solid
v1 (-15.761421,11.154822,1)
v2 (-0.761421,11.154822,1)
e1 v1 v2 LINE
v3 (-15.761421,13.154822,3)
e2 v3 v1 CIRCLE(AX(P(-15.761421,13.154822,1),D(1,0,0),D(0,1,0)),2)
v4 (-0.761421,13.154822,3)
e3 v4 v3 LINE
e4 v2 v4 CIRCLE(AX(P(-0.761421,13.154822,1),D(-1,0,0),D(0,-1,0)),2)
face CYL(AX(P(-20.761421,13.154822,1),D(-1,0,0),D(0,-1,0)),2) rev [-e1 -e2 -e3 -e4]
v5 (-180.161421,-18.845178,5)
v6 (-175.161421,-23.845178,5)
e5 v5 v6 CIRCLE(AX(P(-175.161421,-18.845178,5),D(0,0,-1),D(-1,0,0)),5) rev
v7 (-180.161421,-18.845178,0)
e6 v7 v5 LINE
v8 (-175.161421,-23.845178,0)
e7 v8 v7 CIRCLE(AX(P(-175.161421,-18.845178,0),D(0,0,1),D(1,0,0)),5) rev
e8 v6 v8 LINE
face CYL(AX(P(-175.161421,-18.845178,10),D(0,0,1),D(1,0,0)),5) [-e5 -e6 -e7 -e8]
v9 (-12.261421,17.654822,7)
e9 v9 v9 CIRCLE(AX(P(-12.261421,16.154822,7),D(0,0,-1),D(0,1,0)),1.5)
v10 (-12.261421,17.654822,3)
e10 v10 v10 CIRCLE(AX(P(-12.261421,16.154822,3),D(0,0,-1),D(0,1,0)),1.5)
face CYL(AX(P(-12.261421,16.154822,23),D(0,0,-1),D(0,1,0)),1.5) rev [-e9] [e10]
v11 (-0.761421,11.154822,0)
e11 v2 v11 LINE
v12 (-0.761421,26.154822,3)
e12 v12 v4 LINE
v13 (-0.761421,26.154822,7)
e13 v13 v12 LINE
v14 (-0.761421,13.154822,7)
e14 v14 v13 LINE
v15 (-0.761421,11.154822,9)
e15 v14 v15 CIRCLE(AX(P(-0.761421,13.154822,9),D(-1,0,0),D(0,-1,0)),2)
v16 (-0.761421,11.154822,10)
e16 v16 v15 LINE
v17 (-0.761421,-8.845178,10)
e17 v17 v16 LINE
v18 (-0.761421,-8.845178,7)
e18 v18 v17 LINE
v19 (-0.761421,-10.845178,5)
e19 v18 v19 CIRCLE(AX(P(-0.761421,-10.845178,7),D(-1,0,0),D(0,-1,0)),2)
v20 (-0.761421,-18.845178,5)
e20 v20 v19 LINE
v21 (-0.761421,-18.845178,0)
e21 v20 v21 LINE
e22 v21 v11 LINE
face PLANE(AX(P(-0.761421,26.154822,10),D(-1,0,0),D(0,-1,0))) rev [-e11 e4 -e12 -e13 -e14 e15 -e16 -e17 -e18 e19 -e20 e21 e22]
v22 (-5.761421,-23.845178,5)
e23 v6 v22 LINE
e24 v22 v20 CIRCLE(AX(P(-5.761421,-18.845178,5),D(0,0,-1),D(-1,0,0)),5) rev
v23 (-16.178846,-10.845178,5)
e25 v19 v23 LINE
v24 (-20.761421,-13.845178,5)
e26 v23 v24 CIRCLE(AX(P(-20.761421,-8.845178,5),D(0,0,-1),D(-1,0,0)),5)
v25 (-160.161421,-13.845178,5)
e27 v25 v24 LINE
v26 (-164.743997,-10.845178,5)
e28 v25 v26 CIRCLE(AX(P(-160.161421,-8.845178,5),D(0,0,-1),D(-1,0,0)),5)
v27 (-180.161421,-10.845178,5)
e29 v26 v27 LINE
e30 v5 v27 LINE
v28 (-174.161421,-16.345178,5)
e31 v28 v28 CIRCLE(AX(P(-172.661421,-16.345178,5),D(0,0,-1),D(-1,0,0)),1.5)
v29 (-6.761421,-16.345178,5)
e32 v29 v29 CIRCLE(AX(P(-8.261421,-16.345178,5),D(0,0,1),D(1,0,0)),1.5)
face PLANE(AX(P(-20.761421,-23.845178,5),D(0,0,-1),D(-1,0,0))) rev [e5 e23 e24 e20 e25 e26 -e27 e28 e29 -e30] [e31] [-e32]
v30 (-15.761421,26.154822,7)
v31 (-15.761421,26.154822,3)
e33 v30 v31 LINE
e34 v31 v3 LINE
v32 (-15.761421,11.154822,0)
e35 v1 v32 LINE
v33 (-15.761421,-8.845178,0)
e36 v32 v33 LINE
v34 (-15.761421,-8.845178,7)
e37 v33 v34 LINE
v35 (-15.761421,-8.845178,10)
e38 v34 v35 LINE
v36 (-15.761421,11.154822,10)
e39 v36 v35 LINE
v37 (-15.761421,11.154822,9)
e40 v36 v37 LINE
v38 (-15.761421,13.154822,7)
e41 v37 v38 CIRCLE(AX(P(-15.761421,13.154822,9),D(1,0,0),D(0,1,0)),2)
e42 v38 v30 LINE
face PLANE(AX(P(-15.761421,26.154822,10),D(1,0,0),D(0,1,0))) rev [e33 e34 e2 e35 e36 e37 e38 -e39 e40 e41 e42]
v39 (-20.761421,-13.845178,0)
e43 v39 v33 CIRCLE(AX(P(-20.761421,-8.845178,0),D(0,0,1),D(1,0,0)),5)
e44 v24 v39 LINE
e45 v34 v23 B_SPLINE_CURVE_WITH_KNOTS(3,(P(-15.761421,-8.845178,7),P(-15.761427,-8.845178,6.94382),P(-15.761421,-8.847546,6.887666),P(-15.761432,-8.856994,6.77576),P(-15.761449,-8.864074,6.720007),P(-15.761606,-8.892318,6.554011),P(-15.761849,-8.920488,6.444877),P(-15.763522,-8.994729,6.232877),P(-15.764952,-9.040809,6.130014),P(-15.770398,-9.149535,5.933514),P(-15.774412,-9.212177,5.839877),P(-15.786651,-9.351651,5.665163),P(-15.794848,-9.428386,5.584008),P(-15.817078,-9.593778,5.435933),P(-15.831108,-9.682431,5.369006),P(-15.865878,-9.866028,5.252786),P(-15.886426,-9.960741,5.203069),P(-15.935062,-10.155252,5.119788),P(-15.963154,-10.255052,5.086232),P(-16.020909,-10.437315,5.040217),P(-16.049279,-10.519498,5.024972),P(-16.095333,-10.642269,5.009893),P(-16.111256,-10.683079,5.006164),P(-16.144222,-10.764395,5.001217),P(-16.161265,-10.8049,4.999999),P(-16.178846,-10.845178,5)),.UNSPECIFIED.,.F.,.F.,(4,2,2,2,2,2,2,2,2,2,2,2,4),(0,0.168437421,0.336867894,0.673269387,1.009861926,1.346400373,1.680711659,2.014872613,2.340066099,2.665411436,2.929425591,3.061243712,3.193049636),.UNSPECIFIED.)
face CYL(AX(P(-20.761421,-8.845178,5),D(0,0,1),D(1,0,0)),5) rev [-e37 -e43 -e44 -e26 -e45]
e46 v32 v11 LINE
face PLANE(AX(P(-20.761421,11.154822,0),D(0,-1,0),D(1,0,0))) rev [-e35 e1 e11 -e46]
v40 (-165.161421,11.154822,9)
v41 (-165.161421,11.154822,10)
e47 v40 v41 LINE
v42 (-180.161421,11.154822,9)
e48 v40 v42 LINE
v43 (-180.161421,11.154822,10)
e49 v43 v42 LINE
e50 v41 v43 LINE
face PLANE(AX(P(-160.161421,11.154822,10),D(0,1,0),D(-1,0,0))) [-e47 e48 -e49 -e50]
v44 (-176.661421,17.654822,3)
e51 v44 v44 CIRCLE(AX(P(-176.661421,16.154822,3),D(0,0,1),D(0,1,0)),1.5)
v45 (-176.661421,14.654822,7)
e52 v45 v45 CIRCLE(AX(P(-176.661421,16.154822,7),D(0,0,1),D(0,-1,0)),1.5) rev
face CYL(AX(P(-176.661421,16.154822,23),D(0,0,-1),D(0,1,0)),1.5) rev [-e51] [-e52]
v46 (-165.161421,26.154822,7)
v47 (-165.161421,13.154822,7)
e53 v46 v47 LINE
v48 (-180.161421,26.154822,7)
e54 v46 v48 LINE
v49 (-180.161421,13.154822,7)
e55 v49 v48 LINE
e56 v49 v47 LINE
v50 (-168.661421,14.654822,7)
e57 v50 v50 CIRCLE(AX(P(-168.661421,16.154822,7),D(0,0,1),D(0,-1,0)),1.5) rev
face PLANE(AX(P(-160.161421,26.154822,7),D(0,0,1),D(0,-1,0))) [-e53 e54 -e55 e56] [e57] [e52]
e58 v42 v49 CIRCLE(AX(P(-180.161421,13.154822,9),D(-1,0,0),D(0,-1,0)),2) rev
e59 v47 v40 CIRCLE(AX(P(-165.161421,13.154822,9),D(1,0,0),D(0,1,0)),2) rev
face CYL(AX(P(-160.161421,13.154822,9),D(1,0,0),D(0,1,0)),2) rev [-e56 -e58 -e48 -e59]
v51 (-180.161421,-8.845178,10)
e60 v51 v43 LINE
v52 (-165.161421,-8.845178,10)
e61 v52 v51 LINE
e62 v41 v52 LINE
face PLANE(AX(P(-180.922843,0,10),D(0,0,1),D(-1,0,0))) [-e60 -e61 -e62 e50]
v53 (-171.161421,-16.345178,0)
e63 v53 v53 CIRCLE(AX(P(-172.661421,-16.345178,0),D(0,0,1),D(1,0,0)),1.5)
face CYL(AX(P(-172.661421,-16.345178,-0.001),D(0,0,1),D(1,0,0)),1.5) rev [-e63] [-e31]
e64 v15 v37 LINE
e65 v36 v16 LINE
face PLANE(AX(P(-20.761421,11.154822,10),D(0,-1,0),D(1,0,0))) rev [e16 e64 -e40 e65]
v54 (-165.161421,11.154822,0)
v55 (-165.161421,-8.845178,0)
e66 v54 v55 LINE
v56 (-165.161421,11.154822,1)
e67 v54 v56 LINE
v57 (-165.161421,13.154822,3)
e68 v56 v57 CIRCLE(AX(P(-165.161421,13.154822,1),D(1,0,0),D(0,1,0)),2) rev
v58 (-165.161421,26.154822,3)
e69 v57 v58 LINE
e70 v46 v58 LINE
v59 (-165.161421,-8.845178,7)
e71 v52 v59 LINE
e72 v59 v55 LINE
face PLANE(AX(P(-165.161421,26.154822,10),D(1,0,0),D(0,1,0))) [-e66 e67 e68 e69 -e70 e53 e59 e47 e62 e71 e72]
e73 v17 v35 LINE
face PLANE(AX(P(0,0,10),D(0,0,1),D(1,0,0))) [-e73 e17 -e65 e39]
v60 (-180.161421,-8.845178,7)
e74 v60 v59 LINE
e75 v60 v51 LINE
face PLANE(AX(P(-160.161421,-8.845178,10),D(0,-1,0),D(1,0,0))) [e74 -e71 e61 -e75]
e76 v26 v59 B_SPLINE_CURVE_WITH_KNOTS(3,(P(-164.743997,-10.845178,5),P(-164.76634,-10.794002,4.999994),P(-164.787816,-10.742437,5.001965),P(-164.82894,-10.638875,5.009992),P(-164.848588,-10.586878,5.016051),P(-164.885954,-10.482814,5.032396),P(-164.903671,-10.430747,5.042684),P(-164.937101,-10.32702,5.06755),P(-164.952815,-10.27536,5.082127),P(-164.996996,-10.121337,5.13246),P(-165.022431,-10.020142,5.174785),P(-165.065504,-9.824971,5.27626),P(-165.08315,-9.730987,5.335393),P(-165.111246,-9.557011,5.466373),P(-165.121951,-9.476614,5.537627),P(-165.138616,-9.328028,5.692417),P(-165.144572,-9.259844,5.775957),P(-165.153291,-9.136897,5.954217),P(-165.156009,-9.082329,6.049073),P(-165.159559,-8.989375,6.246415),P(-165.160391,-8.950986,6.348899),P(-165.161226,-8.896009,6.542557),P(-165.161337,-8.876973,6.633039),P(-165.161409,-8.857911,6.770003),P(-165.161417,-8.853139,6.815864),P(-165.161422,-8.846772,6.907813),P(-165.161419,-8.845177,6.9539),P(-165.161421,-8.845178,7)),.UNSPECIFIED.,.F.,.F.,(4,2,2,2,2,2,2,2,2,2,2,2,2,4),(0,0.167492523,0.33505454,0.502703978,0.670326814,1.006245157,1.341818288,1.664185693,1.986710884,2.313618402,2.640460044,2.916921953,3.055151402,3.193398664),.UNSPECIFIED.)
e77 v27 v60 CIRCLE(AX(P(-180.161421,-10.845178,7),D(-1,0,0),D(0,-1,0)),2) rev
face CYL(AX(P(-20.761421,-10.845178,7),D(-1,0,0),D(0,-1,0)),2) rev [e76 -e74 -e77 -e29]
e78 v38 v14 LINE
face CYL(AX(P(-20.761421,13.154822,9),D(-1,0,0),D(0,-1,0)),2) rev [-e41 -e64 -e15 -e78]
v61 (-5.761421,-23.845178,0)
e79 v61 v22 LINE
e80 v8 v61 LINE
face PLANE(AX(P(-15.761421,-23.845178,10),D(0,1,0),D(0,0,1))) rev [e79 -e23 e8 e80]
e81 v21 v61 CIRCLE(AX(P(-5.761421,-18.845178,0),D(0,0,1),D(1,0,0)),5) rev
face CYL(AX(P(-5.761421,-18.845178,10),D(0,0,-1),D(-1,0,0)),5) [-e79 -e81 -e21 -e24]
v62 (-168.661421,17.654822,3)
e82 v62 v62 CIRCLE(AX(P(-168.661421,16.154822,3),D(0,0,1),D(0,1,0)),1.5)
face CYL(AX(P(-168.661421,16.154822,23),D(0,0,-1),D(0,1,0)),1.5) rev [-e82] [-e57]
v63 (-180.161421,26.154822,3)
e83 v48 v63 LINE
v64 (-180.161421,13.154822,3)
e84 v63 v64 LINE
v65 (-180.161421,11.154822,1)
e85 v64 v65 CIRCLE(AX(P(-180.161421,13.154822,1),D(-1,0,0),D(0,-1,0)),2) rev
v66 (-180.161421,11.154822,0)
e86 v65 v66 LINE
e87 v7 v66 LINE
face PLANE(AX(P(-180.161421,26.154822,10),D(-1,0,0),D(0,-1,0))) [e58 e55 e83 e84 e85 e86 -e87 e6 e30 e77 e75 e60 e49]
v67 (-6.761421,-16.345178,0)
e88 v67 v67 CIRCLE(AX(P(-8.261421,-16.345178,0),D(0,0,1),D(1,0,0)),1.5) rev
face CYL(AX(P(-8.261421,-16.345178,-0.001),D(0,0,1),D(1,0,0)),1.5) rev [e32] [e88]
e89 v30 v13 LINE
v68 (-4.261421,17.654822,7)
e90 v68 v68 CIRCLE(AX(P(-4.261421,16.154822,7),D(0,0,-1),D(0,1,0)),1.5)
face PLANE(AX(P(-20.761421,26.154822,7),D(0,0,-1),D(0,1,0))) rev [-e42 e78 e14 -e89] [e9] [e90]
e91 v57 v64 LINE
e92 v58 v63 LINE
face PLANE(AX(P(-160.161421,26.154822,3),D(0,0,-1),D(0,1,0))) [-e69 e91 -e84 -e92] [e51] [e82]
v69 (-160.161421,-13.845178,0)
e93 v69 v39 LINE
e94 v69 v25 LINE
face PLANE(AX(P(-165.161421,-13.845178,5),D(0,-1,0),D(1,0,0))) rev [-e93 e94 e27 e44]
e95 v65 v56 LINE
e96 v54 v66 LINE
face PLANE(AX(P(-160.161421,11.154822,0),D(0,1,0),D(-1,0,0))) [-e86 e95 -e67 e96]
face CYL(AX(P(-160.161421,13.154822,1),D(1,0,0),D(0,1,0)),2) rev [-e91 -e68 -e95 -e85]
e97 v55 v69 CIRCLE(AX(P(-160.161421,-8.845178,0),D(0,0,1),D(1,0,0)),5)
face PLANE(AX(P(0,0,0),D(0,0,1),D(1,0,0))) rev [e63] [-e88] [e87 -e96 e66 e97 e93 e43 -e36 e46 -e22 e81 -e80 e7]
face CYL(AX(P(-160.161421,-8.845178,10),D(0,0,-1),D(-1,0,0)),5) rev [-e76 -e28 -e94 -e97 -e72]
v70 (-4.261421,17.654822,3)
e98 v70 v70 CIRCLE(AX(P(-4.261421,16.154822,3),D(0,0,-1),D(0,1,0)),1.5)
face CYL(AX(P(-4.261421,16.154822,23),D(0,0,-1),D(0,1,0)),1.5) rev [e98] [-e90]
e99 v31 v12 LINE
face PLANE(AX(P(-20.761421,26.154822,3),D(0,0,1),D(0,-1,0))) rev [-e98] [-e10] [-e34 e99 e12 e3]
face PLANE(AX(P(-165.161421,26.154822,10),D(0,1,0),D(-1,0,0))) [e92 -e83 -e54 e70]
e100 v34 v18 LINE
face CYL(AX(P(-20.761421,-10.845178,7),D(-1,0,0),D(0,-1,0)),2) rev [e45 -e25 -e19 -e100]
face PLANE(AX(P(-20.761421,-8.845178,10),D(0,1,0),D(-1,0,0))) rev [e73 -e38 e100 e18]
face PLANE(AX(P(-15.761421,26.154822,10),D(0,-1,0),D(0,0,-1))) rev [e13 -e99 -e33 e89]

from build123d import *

# Parameters (mm, degrees)
SKETCH1_W            = 15
SKETCH1_H            = 50
BOSS_EXTRUDE1_DEPTH  = 10
SKETCH2_W            = 3
SKETCH2_H            = 15
CUT_EXTRUDE1_DEPTH   = 20
SKETCH3_R            = 1.5
CUT_EXTRUDE2_DEPTH   = 20
SKETCH4_W            = 5
SKETCH4_H            = 15
CUT_EXTRUDE3_DEPTH   = 20
CUT_EXTRUDE4_REACH   = 32.943
SKETCH5_R            = 1.5
FILLET1_R            = 2
SKETCH6_W            = 5
SKETCH6_H            = 10
BOSS_EXTRUDE2_DEPTH  = 149.4
FILLET1_OF_MIRROR5_R = 2
FILLET2_R            = 5


with BuildPart() as part:
    # Sketch1 → Boss-Extrude1 (new body)
    with BuildSketch(Plane.XY):
        with Locations((-8.26142132, 1.154822335)):
            Rectangle(SKETCH1_W, SKETCH1_H)
    boss_extrude1 = extrude(amount=BOSS_EXTRUDE1_DEPTH)

    # Sketch2 → Cut-Extrude1 (cut)
    with BuildSketch(Plane(origin=(-0.76142132, 0, 0), x_dir=(0, 0, -1), z_dir=(1, 0, 0))):
        with Locations((-1.5, 18.654822335)):
            Rectangle(SKETCH2_W, SKETCH2_H)
        with Locations((-8.5, 18.654822335)):
            Rectangle(SKETCH2_W, SKETCH2_H)
    cut_extrude1 = extrude(amount=-CUT_EXTRUDE1_DEPTH, mode=Mode.SUBTRACT)

    # Sketch3 → Cut-Extrude2 (cut)
    with BuildSketch(Plane(origin=(0, 0, 3), x_dir=(-1, 0, 0), z_dir=(0, 0, -1))):
        with Locations(Location((4.26142132, 16.154822335, 0), (0, 0, 90))):
            Circle(SKETCH3_R)
        with Locations(Location((12.26142132, 16.154822335, 0), (0, 0, 90))):
            Circle(SKETCH3_R)
    cut_extrude2 = extrude(amount=-CUT_EXTRUDE2_DEPTH, mode=Mode.SUBTRACT)

    # Sketch4 → Cut-Extrude3 (cut)
    with BuildSketch(Plane(origin=(-0.76142132, 0, 0), x_dir=(0, 0, -1), z_dir=(1, 0, 0))):
        with Locations((-7.5, -16.345177665)):
            Rectangle(SKETCH4_W, SKETCH4_H)
    cut_extrude3 = extrude(amount=-CUT_EXTRUDE3_DEPTH, mode=Mode.SUBTRACT)

    # Sketch5 → Cut-Extrude4 (cut, up to next)
    with BuildSketch(Plane.XY.offset(5), mode=Mode.PRIVATE) as cut_extrude4_sk1:
        with Locations((-8.26142132, -16.345177665)):
            Circle(SKETCH5_R)
    cut_extrude4_tool1 = extrude(cut_extrude4_sk1.sketch, amount=-CUT_EXTRUDE4_REACH, mode=Mode.PRIVATE) & part.part
    cut_extrude4 = cut_extrude4_tool1.solids().sort_by_distance((-8.261421, -16.345178, 5))[0]
    add(cut_extrude4, mode=Mode.SUBTRACT)

    # Fillet1
    fillet1_edges = [part.edges().sort_by_distance(p)[0] for p in [
        (-8.26142132, 11.154822335, 3),
        (-8.26142132, 11.154822335, 7),
        (-8.26142132, -8.845177665, 5),
    ]]
    fillet(fillet1_edges, radius=FILLET1_R)

    # Sketch6 → Boss-Extrude2 (add)
    with BuildSketch(Plane.ZY.offset(15.76142132)):
        with Locations((2.5, -18.845177665)):
            Rectangle(SKETCH6_W, SKETCH6_H)
    extrude(amount=BOSS_EXTRUDE2_DEPTH)

    # Mirror5: Boss-Extrude1, Cut-Extrude1, Cut-Extrude2, Cut-Extrude3, Cut-Extrude4 across plane
    add(boss_extrude1.mirror(Plane.ZY.offset(90.46142132)))
    add(cut_extrude1.mirror(Plane.ZY.offset(90.46142132)), mode=Mode.SUBTRACT)
    add(cut_extrude2.mirror(Plane.ZY.offset(90.46142132)), mode=Mode.SUBTRACT)
    add(cut_extrude3.mirror(Plane.ZY.offset(90.46142132)), mode=Mode.SUBTRACT)
    add(cut_extrude4.mirror(Plane.ZY.offset(90.46142132)), mode=Mode.SUBTRACT)

    # Fillet1 of Mirror5
    fillet1_of_mirror5_edges = [part.edges().sort_by_distance(p)[0] for p in [
        (-172.66142132, 11.154822335, 3),
        (-172.66142132, 11.154822335, 7),
        (-172.66142132, -8.845177665, 5),
    ]]
    fillet(fillet1_of_mirror5_edges, radius=FILLET1_OF_MIRROR5_R)

    # Fillet2
    fillet2_edges = [part.edges().sort_by_distance(p)[0] for p in [
        (-180.16142132, -23.845177665, 2.5),
        (-0.76142132, -23.845177665, 2.5),
        (-165.16142132, -13.845177665, 2.5),
        (-15.76142132, -13.845177665, 2.5),
    ]]
    fillet(fillet2_edges, radius=FILLET2_R - 0.0001)  # a hair under: the kernel refuses the full size


solid = part.part
